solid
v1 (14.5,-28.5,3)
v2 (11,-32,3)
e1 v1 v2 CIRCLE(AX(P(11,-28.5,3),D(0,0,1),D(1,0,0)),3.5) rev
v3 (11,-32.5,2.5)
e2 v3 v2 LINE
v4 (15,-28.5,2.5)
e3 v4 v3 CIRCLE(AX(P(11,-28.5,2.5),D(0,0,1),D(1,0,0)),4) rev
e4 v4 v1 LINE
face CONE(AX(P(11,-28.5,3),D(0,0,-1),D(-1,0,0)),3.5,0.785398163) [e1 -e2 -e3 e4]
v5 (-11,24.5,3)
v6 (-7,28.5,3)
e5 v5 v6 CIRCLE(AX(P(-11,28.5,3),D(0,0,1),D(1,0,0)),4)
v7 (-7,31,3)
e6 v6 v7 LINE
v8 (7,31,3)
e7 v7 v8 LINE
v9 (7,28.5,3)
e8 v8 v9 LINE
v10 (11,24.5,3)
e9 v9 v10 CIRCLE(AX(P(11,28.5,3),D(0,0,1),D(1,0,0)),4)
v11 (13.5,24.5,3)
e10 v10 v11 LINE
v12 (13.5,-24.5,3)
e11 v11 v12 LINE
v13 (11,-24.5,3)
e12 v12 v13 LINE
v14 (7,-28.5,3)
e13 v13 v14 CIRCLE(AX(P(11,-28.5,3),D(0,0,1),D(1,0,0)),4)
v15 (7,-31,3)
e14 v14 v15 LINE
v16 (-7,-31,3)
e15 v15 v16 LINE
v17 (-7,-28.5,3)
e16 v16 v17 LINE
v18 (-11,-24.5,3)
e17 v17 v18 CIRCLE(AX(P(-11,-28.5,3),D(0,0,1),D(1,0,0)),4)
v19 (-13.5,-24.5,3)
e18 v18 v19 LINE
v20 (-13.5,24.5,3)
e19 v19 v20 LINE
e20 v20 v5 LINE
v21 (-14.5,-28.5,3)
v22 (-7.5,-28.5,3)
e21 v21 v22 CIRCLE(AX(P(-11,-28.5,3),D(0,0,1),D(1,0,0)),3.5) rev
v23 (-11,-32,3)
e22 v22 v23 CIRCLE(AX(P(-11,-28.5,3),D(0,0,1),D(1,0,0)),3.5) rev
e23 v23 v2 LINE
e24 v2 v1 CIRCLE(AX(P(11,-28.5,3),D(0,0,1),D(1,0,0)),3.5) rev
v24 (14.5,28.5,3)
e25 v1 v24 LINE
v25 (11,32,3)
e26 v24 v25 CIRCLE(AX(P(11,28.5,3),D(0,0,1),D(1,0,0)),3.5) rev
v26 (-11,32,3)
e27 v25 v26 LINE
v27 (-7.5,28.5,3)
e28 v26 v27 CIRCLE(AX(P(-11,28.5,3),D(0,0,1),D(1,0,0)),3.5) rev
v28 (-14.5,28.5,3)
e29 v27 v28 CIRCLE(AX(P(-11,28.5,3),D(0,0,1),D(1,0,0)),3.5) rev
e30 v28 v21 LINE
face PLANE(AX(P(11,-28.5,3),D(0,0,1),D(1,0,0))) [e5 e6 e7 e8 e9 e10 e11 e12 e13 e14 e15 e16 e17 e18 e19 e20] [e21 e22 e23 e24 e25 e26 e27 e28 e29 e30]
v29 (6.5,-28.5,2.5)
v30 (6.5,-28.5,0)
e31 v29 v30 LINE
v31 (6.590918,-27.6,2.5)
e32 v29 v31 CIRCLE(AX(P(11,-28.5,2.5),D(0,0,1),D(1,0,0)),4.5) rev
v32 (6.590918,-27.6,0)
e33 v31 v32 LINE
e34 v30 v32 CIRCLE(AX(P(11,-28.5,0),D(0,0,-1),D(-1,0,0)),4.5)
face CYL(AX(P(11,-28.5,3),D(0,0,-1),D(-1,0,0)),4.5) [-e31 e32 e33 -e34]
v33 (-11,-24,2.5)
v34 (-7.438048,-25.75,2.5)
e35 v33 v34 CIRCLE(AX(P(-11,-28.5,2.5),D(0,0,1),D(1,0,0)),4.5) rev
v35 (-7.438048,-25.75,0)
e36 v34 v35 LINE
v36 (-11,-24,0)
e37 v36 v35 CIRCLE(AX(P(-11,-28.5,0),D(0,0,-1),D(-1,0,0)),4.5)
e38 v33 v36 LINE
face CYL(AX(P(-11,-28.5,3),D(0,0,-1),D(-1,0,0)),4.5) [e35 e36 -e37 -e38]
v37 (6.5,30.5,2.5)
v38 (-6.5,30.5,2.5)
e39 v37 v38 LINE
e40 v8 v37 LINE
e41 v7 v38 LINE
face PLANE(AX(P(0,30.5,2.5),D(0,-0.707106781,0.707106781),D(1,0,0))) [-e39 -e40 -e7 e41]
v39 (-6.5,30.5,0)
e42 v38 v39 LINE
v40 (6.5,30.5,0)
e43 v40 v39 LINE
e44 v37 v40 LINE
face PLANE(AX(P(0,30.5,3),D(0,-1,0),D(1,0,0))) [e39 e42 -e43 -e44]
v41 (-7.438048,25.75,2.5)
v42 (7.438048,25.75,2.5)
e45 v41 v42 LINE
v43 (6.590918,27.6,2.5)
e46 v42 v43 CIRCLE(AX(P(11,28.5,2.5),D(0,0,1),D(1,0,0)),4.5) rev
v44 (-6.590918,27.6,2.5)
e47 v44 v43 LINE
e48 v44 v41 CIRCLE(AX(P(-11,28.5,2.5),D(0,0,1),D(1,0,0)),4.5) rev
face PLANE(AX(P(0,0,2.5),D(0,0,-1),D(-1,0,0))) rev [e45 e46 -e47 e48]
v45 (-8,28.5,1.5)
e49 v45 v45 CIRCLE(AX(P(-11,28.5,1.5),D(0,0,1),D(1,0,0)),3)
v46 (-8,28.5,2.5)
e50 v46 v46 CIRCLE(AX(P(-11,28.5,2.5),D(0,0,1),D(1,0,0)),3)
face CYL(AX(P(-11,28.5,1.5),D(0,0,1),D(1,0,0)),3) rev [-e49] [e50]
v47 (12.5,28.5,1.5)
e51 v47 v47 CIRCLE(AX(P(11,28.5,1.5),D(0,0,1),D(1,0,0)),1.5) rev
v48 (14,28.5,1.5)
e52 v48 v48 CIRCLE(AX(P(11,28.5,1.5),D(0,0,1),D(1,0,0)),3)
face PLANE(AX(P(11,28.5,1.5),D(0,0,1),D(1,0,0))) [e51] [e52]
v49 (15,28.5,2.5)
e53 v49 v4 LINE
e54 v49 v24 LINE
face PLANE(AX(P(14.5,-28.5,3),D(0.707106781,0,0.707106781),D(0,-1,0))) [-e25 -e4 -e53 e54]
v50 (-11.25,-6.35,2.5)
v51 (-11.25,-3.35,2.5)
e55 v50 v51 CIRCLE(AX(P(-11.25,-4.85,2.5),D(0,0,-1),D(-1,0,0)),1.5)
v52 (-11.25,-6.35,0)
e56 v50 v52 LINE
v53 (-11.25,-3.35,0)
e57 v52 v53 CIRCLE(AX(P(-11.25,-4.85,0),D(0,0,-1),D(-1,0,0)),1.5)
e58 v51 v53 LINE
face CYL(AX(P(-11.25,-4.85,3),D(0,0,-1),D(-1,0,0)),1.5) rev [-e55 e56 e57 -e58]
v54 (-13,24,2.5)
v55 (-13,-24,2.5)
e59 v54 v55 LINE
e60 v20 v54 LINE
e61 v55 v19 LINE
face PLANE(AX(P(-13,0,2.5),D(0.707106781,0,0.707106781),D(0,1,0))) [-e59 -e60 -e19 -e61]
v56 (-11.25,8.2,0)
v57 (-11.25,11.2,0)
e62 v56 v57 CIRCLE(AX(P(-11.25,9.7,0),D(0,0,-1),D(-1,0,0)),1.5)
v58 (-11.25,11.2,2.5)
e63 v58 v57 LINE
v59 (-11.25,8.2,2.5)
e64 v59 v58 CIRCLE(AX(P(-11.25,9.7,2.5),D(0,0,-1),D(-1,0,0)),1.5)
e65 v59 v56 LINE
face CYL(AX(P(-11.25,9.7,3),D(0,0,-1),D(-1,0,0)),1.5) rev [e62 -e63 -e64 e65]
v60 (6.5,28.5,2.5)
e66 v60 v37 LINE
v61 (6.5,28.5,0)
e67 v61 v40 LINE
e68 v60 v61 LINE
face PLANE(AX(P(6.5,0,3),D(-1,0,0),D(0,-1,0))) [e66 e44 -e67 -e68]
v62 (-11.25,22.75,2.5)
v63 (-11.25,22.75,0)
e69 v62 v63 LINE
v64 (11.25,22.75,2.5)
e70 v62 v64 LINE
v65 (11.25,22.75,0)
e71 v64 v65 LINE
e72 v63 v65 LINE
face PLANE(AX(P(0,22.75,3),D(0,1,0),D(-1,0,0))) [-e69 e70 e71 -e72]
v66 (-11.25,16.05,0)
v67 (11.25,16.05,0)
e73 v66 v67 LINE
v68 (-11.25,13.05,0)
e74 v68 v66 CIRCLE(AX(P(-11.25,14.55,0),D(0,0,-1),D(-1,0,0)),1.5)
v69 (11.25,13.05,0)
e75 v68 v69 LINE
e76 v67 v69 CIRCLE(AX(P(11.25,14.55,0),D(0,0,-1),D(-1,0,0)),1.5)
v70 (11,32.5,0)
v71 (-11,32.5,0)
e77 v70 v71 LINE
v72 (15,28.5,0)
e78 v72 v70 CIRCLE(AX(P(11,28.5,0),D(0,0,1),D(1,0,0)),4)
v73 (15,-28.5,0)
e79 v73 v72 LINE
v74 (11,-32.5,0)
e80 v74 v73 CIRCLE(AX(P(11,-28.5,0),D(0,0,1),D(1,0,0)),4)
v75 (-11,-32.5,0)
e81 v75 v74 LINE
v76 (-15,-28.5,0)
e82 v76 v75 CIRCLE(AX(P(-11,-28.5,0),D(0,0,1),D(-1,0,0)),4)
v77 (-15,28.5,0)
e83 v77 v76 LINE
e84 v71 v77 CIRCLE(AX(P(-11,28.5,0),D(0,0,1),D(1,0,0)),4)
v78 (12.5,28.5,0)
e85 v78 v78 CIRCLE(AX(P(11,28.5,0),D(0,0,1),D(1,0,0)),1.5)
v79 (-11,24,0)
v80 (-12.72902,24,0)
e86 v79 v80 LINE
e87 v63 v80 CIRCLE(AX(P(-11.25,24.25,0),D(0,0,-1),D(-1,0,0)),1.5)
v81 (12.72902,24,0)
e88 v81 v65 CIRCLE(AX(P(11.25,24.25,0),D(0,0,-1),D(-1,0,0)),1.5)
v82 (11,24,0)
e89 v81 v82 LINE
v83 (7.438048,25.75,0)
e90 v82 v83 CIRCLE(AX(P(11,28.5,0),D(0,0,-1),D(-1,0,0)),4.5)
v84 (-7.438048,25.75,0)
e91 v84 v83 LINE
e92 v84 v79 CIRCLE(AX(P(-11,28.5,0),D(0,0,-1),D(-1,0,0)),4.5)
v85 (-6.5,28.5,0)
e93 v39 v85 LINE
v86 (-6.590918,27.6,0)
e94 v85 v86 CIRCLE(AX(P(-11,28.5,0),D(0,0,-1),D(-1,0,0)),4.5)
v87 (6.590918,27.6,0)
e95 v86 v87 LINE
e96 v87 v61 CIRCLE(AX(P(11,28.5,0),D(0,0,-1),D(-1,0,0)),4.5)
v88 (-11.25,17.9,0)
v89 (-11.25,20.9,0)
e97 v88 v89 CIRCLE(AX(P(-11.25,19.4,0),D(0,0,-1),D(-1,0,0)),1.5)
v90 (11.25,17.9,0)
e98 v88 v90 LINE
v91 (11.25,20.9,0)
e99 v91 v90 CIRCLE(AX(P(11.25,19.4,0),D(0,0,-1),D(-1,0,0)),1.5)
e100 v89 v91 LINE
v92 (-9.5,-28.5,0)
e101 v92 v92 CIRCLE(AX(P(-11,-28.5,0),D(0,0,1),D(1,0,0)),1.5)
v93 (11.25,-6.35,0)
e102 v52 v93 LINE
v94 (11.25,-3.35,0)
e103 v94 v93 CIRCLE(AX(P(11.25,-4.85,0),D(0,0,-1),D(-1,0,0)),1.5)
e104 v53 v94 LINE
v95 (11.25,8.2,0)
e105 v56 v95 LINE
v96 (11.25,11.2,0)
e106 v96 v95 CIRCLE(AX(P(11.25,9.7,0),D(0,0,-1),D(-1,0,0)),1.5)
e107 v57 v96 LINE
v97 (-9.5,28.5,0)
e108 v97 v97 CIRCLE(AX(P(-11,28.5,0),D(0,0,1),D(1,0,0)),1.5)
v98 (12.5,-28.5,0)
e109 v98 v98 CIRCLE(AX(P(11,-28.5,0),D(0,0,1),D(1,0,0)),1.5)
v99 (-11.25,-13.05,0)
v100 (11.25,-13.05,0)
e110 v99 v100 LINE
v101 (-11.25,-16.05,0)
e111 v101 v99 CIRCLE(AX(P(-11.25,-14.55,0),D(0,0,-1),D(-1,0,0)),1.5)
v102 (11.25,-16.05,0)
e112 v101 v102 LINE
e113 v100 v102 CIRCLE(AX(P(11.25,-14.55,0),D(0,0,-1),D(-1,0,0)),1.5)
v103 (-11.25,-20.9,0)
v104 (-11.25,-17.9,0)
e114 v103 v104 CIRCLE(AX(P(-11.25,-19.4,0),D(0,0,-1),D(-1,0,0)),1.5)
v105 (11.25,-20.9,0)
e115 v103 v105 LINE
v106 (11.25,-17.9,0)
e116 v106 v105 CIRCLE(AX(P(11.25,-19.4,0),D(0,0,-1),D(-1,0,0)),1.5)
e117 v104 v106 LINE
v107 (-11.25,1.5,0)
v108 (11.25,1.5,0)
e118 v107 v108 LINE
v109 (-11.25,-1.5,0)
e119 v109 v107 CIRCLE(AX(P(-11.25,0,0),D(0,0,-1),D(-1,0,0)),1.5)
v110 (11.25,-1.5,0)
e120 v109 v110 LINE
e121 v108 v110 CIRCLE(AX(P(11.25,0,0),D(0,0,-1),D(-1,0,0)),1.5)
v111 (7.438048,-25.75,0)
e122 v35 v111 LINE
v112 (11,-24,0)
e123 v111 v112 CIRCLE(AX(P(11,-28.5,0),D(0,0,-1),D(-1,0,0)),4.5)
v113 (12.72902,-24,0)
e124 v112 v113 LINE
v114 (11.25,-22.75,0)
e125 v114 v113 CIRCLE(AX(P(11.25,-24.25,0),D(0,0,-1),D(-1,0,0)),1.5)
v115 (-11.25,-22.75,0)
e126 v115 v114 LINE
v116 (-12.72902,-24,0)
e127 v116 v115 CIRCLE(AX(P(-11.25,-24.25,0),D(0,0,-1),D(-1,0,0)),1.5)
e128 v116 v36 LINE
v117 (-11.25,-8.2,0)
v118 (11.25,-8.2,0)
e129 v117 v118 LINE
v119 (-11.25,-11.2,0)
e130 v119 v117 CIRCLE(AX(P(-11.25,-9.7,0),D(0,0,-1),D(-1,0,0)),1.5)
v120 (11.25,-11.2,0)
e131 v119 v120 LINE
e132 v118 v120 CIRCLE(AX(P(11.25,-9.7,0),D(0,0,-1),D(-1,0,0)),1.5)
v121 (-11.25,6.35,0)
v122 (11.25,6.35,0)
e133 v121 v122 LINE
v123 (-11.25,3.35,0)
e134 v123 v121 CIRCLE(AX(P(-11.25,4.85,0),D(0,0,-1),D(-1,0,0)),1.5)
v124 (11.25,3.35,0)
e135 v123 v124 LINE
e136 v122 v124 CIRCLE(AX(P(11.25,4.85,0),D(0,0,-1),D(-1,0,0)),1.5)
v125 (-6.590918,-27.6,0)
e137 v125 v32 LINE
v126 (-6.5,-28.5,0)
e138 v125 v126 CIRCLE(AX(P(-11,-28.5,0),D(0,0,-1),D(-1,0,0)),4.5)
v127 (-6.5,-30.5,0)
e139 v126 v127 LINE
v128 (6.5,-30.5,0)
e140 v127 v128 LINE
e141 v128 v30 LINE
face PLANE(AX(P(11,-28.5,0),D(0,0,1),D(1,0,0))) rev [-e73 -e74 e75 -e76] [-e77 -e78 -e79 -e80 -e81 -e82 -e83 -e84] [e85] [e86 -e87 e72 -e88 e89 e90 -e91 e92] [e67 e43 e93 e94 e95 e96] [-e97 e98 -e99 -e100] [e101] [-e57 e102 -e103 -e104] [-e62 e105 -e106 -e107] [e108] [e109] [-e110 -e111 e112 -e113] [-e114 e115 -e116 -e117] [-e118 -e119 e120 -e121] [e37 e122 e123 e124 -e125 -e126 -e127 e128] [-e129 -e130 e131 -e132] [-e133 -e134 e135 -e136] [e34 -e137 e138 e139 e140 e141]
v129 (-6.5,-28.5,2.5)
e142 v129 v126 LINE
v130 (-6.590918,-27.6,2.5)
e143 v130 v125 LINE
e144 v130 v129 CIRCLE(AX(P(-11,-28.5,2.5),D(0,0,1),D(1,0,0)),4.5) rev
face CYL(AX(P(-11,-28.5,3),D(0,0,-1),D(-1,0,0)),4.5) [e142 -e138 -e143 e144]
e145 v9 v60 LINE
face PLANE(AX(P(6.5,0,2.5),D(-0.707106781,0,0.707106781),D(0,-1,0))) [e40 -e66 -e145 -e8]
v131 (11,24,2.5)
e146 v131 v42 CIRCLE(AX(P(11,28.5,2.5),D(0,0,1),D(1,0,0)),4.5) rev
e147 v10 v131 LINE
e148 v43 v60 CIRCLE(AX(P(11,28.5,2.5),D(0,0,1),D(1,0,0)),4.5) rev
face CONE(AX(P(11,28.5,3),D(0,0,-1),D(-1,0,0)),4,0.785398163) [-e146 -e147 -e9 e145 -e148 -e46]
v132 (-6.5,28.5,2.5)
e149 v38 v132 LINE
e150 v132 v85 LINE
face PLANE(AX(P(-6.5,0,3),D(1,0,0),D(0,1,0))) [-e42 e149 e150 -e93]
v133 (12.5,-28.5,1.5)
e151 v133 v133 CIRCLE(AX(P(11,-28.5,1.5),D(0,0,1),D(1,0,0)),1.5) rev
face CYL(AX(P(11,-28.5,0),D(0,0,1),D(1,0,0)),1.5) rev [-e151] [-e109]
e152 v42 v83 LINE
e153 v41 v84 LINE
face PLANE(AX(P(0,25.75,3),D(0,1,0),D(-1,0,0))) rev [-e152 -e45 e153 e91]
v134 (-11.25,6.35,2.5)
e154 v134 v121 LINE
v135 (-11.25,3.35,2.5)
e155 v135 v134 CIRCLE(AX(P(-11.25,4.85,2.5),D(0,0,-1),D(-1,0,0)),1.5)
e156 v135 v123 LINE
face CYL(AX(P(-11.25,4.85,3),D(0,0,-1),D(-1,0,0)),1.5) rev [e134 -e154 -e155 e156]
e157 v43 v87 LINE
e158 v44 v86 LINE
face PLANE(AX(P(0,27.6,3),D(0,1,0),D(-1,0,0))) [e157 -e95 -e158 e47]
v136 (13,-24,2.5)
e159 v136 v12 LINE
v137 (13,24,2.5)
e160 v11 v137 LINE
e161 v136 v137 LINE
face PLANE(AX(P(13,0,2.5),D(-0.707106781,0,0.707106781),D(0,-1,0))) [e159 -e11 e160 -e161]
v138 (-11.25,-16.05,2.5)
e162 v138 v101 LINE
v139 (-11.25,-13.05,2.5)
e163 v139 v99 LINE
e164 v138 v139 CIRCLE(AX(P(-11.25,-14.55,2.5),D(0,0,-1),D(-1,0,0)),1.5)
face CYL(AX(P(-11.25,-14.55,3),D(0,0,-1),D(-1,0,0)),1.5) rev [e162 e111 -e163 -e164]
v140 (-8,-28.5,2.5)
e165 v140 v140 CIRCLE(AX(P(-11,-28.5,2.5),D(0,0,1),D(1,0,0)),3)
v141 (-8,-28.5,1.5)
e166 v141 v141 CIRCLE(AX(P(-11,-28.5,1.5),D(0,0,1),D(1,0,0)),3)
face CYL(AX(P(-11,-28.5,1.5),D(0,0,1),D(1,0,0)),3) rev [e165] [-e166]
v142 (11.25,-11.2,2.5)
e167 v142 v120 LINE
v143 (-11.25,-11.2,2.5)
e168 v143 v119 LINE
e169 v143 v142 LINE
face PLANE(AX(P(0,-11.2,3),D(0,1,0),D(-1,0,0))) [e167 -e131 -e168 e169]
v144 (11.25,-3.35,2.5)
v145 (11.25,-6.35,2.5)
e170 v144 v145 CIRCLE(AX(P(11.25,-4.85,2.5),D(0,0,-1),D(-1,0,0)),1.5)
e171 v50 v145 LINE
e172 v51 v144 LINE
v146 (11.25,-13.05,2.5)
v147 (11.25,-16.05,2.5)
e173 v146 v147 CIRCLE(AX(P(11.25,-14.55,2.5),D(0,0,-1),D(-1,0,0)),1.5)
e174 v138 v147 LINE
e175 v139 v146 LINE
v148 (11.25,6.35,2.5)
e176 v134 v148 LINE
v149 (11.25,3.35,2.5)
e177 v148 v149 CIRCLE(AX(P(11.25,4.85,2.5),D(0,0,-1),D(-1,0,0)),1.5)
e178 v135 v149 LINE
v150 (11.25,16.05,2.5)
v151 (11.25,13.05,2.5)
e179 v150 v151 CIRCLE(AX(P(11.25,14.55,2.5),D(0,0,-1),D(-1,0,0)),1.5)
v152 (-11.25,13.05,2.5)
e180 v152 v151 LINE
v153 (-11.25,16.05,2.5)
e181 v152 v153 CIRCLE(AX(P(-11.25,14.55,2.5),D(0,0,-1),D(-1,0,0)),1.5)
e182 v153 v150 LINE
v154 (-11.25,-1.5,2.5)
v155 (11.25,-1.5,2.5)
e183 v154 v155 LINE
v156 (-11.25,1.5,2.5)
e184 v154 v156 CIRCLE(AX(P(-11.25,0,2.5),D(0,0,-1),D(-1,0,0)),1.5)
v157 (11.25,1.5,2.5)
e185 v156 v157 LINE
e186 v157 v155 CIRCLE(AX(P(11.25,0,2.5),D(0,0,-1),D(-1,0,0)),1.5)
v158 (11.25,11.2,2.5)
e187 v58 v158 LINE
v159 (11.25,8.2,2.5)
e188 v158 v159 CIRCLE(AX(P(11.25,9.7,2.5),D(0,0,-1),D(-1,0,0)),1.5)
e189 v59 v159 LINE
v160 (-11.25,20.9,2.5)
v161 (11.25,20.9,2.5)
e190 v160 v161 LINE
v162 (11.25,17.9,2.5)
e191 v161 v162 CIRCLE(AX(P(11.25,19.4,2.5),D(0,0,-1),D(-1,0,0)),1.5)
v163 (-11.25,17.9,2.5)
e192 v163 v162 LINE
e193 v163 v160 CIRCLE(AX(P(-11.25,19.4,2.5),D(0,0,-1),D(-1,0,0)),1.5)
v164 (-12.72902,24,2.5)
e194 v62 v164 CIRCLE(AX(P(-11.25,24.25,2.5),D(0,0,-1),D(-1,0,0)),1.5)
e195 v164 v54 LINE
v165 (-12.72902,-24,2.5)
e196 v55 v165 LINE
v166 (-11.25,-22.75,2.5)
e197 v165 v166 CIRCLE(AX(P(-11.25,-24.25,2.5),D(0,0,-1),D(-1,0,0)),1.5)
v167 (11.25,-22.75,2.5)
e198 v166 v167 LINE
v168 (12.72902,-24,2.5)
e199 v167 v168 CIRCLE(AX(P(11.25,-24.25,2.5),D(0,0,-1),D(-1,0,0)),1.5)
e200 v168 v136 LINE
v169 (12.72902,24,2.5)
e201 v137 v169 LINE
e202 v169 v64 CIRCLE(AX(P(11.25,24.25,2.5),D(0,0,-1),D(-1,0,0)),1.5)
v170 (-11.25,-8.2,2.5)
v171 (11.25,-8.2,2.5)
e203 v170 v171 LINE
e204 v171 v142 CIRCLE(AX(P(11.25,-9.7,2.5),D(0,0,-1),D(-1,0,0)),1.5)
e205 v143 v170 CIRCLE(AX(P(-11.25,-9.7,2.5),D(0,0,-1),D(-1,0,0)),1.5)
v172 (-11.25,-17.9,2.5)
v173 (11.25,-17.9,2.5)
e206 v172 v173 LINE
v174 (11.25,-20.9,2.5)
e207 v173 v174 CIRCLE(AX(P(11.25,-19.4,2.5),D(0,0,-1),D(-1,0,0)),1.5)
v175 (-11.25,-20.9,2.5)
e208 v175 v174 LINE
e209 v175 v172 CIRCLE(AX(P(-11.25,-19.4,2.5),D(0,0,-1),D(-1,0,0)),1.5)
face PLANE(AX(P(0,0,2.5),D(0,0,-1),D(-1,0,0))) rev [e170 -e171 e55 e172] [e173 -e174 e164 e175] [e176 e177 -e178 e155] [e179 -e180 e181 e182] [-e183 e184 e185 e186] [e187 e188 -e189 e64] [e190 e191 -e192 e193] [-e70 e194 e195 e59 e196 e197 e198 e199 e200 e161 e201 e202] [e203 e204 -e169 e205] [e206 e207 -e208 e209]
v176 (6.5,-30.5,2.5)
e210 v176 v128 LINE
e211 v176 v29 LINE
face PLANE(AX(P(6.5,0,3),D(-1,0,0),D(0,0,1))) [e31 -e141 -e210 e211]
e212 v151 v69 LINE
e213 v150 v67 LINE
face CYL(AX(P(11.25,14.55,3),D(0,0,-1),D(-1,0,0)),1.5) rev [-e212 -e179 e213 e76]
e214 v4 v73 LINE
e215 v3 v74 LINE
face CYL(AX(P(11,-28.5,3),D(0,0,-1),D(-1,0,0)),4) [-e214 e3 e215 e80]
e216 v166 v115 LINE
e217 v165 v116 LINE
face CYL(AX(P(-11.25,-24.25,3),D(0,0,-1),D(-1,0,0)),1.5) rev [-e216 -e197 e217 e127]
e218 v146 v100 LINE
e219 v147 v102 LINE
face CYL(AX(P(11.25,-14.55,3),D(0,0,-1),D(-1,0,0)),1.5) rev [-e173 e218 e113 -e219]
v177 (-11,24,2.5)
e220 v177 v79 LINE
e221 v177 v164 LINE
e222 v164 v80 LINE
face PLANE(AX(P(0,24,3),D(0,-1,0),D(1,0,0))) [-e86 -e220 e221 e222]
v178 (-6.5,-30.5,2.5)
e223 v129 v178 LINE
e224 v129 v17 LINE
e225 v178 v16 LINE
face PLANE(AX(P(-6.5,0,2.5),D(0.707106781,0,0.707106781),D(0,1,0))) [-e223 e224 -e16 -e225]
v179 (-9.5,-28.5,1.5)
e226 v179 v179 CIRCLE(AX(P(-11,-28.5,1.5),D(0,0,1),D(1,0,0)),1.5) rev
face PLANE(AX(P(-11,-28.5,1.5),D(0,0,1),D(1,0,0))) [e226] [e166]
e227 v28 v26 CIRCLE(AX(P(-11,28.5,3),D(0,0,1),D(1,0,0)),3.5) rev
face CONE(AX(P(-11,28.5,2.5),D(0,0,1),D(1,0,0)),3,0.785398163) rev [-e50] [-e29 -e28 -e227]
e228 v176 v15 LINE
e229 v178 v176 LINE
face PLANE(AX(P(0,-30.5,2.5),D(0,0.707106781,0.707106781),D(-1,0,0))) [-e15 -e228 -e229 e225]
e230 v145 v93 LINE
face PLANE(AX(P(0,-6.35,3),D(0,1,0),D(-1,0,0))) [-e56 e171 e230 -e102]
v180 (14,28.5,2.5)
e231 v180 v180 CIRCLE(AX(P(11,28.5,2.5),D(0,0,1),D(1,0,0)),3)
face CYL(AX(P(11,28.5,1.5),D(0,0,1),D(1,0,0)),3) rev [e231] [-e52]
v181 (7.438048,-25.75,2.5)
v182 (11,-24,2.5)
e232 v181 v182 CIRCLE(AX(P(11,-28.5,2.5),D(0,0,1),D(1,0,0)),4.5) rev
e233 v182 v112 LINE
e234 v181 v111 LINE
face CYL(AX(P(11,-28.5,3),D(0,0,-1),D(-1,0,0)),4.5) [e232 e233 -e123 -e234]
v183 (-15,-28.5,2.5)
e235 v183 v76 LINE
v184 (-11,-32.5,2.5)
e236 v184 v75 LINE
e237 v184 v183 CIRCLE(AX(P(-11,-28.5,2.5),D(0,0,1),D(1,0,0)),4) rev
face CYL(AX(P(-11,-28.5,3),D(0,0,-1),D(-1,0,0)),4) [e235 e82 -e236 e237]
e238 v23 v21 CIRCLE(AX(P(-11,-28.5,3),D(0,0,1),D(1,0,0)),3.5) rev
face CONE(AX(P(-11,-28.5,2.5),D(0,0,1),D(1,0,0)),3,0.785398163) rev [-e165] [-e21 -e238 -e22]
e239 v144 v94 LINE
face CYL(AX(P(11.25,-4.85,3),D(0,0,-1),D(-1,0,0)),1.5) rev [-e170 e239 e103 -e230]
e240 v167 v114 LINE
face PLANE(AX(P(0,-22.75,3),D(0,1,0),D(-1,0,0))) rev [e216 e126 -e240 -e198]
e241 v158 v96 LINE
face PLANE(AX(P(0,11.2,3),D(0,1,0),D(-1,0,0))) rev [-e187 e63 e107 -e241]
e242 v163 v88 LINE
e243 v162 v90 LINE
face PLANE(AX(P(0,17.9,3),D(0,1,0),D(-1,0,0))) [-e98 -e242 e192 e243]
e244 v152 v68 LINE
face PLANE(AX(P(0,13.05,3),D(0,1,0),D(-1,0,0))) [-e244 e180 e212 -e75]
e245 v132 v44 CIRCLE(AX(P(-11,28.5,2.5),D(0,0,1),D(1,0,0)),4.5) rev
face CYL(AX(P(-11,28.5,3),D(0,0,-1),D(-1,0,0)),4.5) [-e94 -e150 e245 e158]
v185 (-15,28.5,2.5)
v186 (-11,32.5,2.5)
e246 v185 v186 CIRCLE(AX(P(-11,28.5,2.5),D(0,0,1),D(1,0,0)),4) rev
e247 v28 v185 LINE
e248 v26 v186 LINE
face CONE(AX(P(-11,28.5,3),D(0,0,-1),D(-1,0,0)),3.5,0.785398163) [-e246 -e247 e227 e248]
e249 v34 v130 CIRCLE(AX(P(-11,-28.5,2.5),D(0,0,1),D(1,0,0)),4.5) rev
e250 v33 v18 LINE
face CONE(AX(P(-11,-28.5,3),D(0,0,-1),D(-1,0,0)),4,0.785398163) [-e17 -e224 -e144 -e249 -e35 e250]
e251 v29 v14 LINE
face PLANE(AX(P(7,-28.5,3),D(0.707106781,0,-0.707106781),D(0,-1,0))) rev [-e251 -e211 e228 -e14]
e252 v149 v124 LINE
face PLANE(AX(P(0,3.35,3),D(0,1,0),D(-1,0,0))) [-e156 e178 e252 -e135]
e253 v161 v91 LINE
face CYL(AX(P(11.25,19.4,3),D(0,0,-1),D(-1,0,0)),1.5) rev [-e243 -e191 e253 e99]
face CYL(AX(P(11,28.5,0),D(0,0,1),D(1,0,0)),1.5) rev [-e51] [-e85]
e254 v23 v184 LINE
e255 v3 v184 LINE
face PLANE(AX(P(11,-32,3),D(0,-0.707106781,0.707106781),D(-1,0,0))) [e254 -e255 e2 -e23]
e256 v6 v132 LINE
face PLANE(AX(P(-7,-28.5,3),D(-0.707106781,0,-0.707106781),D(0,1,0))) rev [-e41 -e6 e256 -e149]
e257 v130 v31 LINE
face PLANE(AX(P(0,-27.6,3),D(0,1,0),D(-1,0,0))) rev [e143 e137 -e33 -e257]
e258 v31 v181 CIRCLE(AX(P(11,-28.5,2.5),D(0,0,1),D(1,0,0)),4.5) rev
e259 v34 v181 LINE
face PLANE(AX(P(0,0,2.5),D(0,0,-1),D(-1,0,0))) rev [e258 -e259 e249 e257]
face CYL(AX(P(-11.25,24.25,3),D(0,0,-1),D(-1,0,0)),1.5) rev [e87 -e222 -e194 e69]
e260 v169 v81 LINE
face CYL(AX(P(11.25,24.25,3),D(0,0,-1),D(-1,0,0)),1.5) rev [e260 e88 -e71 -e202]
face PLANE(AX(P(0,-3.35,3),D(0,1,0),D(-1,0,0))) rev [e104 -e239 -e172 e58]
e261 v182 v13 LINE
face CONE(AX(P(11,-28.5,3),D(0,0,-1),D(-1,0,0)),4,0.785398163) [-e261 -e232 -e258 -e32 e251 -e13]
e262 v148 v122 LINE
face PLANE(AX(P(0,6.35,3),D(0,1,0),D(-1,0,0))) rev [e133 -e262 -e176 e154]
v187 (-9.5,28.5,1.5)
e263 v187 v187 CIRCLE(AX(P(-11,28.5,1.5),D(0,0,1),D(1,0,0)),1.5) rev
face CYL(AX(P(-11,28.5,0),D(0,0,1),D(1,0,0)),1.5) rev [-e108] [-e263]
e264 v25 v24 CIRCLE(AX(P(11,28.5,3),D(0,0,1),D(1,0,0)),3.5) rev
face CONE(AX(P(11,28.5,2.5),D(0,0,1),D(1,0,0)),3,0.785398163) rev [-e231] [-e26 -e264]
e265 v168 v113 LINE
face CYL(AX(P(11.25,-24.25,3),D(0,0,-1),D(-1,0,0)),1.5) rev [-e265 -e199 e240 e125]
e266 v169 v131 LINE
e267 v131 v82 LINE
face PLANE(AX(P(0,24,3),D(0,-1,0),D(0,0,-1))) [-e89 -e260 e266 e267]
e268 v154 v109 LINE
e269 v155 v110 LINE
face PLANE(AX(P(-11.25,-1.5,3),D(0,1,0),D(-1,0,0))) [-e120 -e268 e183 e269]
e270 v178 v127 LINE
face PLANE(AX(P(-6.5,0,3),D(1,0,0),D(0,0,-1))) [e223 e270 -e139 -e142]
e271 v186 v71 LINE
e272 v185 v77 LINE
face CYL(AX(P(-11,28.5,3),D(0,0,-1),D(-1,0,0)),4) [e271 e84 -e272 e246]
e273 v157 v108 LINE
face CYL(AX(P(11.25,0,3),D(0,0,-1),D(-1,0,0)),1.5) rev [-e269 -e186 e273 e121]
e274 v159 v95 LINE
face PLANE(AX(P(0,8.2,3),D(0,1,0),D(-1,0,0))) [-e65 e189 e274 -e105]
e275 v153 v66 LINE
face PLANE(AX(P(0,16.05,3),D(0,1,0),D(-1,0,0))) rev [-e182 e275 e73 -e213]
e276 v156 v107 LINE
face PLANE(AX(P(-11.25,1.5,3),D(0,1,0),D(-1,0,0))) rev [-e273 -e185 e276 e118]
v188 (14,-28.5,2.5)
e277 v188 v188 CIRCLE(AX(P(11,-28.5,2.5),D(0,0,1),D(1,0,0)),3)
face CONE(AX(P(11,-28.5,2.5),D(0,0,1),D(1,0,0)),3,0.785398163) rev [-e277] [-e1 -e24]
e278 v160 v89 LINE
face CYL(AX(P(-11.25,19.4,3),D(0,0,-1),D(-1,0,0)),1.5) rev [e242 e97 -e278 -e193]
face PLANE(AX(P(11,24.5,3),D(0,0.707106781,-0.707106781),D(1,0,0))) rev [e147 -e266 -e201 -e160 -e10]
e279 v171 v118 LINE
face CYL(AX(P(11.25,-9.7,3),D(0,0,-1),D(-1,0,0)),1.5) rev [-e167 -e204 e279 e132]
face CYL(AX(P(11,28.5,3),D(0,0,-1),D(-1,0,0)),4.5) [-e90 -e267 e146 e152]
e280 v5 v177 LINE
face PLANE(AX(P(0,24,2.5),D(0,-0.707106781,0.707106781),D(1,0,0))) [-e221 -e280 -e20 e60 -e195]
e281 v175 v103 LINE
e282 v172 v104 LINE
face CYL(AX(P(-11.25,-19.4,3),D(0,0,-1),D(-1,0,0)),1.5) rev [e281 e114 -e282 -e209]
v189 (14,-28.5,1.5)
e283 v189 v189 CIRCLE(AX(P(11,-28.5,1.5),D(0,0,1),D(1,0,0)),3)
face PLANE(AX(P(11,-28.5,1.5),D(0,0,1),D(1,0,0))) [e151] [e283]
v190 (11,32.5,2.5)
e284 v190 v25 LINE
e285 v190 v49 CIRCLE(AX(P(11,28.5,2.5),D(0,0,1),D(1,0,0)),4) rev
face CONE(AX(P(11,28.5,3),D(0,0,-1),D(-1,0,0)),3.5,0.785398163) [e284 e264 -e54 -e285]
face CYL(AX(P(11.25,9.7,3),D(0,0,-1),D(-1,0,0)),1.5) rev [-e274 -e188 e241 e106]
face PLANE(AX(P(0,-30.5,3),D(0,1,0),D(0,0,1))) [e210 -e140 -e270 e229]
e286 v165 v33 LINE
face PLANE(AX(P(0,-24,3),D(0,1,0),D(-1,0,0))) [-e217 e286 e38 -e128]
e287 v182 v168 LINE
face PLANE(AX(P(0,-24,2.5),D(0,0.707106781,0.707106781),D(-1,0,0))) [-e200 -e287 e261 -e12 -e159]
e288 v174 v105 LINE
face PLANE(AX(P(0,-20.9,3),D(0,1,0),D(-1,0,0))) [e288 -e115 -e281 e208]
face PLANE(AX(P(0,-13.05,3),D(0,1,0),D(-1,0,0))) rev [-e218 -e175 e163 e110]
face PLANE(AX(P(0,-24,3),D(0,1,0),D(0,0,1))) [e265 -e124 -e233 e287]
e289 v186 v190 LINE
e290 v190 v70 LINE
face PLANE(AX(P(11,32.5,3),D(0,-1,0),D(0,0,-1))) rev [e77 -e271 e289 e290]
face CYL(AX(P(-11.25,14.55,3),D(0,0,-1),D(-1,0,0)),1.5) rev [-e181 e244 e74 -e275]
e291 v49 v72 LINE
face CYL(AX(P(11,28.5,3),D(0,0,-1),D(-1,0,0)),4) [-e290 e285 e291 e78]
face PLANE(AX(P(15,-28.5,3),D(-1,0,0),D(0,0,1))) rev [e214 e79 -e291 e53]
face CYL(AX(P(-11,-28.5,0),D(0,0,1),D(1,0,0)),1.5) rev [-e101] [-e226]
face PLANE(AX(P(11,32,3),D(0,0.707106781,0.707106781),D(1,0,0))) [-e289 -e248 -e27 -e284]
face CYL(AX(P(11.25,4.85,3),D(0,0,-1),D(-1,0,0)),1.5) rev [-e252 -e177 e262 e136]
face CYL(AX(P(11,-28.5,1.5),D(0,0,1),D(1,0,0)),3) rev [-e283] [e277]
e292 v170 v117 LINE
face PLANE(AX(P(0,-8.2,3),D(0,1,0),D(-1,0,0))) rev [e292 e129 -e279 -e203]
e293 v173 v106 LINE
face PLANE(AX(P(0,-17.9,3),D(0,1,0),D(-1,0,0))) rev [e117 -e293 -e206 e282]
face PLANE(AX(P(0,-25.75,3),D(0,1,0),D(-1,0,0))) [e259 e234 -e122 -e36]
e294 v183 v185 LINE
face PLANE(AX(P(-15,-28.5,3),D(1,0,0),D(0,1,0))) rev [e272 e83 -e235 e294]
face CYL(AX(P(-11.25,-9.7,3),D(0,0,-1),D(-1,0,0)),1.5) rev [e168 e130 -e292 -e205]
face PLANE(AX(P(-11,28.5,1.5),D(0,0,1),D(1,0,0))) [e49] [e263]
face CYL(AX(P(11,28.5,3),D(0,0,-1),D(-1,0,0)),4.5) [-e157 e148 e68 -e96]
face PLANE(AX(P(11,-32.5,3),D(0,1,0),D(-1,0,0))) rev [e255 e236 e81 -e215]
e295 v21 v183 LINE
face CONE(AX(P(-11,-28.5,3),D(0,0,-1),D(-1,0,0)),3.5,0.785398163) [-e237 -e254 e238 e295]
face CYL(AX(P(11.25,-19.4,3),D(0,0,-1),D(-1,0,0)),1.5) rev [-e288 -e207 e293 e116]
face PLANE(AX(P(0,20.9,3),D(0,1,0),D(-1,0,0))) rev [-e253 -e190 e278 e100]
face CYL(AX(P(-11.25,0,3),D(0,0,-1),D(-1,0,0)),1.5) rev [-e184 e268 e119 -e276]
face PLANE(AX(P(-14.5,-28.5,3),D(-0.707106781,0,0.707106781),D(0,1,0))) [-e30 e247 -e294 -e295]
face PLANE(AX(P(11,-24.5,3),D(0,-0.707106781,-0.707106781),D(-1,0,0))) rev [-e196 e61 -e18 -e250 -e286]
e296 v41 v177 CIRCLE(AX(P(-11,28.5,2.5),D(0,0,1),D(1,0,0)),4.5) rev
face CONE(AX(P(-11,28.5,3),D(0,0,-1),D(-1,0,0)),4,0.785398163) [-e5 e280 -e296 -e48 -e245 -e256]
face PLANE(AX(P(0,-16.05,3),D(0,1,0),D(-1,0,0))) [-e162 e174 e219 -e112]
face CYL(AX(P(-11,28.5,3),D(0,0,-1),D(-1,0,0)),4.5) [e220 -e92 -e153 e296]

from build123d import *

# Parameters (mm, degrees)
BASE_DEPTH          = 3
SKETCH2_R           = 1.5
CUT_EXTRUDE1_DEPTH  = 36.920050111
CUT_EXTRUDE2_DEPTH  = 36.920050111
SKETCH6_R           = 3
CUT_EXTRUDE3_DEPTH  = 1.5
CHAMFER2_SIZE       = 0.5
BOSS_EXTRUDE1_START = -2.5
BOSS_EXTRUDE1_DEPTH = 2.5
CUT_EXTRUDE4_START  = -2.5
CUT_EXTRUDE4_DEPTH  = 2.5


# Read off the part's stored shape, not the designer's step: Cut-Extrude4
with BuildPart() as part:
    # Sketch1 → Base (new body)
    with BuildSketch(Plane.XY):
        with BuildLine():
            Line((11, -32.5), (-11, -32.5))
            ThreePointArc((-11, -32.5), (-13.828427125, -31.328427125), (-15, -28.5))
            Line((-15, -28.5), (-15, 28.5))
            ThreePointArc((-15, 28.5), (-13.828427125, 31.328427125), (-11, 32.5))
            Line((-11, 32.5), (11, 32.5))
            ThreePointArc((11, 32.5), (13.828427125, 31.328427125), (15, 28.5))
            Line((15, 28.5), (15, -28.5))
            ThreePointArc((15, -28.5), (13.828427125, -31.328427125), (11, -32.5))
        make_face()
    extrude(amount=BASE_DEPTH)

    # Sketch2 → Cut-Extrude1 (cut, through all)
    with BuildSketch(Plane.XY.offset(3)):
        with Locations((-11, 28.5)):
            Circle(SKETCH2_R)
        with Locations((-11, -28.5)):
            Circle(SKETCH2_R)
        with Locations((11, -28.5)):
            Circle(SKETCH2_R)
        with Locations((11, 28.5)):
            Circle(SKETCH2_R)
    extrude(amount=-CUT_EXTRUDE1_DEPTH, mode=Mode.SUBTRACT)

    # Sketch3 → Cut-Extrude2 (cut, through all)
    with BuildSketch(Plane.XY.offset(3)):
        with BuildLine():
            Line((6.5, 28.5), (6.5, 30.5))
            Line((6.5, 30.5), (-6.5, 30.5))
            Line((-6.5, 30.5), (-6.5, 28.5))
            ThreePointArc((-6.5, 28.5), (-7.818019485, 25.318019485), (-11, 24))
            Line((-11, 24), (-13, 24))
            Line((-13, 24), (-13, -24))
            Line((-13, -24), (-11, -24))
            ThreePointArc((-11, -24), (-7.818019485, -25.318019485), (-6.5, -28.5))
            Line((-6.5, -28.5), (-6.5, -30.5))
            Line((-6.5, -30.5), (6.5, -30.5))
            Line((6.5, -30.5), (6.5, -28.5))
            ThreePointArc((6.5, -28.5), (7.818019485, -25.318019485), (11, -24))
            Line((11, -24), (13, -24))
            Line((13, -24), (13, 24))
            Line((13, 24), (11, 24))
            ThreePointArc((11, 24), (7.818019485, 25.318019485), (6.5, 28.5))
        make_face()
    extrude(amount=-CUT_EXTRUDE2_DEPTH, mode=Mode.SUBTRACT)

    # Sketch6 → Cut-Extrude3 (cut)
    with BuildSketch(Plane.XY.offset(3)):
        with Locations((-11, -28.5)):
            Circle(SKETCH6_R)
        with Locations((11, -28.5)):
            Circle(SKETCH6_R)
        with Locations((11, 28.5)):
            Circle(SKETCH6_R)
        with Locations((-11, 28.5)):
            Circle(SKETCH6_R)
    extrude(amount=-CUT_EXTRUDE3_DEPTH, mode=Mode.SUBTRACT)

    # Chamfer2
    chamfer2_edges = [part.edges().sort_by_distance(p)[0] for p in [
        (7.818019485, 25.318019485, 3),
        (13, 0, 3),
        (7.818019485, -25.318019485, 3),
        (-7.818019485, -25.318019485, 3),
        (-13, 0, 3),
        (-7.818019485, 25.318019485, 3),
        (0, -32.5, 3),
        (-13.828427125, -31.328427125, 3),
        (-15, 0, 3),
        (-13.828427125, 31.328427125, 3),
        (0, 32.5, 3),
        (13.828427125, 31.328427125, 3),
        (15, 0, 3),
        (13.828427125, -31.328427125, 3),
        (-14, -28.5, 3),
        (-14, 28.5, 3),
        (8, 28.5, 3),
        (8, -28.5, 3),
        (0, -30.5, 3),
        (0, 30.5, 3),
        (12, 24, 3),
        (6.5, 29.5, 3),
        (-6.5, 29.5, 3),
        (-12, 24, 3),
        (-12, -24, 3),
        (-6.5, -29.5, 3),
        (6.5, -29.5, 3),
        (12, -24, 3),
    ]]
    chamfer(chamfer2_edges, length=CHAMFER2_SIZE - 0.0001)  # a hair under: the kernel refuses the full size

    # Sketch9 → Boss-Extrude1 (add)
    with BuildSketch(Plane(origin=(0, 0, 0), x_dir=(-1, 0, 0), z_dir=(0, 0, -1)).offset(BOSS_EXTRUDE1_START)):
        with BuildLine():
            ThreePointArc((-6.5, -28.5), (-7.818019485, -25.318019485), (-11, -24))
            Line((-11, -24), (-13, -24))
            Line((-13, -24), (-13, 24))
            Line((-13, 24), (-11, 24))
            ThreePointArc((-11, 24), (-7.818019485, 25.318019485), (-6.5, 28.5))
            Line((-6.5, 28.5), (-6.5, 30.5))
            Line((-6.5, 30.5), (6.5, 30.5))
            Line((6.5, 30.5), (6.5, 28.5))
            ThreePointArc((6.5, 28.5), (7.818019485, 25.318019485), (11, 24))
            Line((11, 24), (13, 24))
            Line((13, 24), (13, -24))
            Line((13, -24), (11, -24))
            ThreePointArc((11, -24), (7.818019485, -25.318019485), (6.5, -28.5))
            Line((6.5, -28.5), (6.5, -30.5))
            Line((6.5, -30.5), (-6.5, -30.5))
            Line((-6.5, -30.5), (-6.5, -28.5))
        make_face()
    extrude(amount=BOSS_EXTRUDE1_DEPTH)

    # Cut-Extrude4 outline → Cut-Extrude4 (cut)
    with BuildSketch(Plane(origin=(0, 0, 0), x_dir=(-1, 0, 0), z_dir=(0, 0, -1)).offset(CUT_EXTRUDE4_START)):
        with BuildLine():
            ThreePointArc((11.25, -6.35), (12.75, -4.85), (11.25, -3.35))
            Line((11.25, -3.35), (-11.25, -3.35))
            ThreePointArc((-11.25, -3.35), (-12.75, -4.85), (-11.25, -6.35))
            Line((-11.25, -6.35), (11.25, -6.35))
        make_face()
        with BuildLine():
            ThreePointArc((11.25, 17.9), (12.75, 19.4), (11.25, 20.9))
            Line((11.25, 20.9), (-11.25, 20.9))
            ThreePointArc((-11.25, 20.9), (-12.75, 19.4), (-11.25, 17.9))
            Line((-11.25, 17.9), (11.25, 17.9))
        make_face()
        with BuildLine():
            Line((-11, 24), (-12.729019946, 24))
            ThreePointArc((-12.729019946, 24), (-12.218245837, 23.104356076), (-11.25, 22.75))
            Line((-11.25, 22.75), (11.25, 22.75))
            ThreePointArc((11.25, 22.75), (12.218245837, 23.104356076), (12.729019946, 24))
            Line((12.729019946, 24), (11, 24))
            ThreePointArc((11, 24), (9.015686517, 24.461126395), (7.438048288, 25.75))
            Line((7.438048288, 25.75), (-7.438048288, 25.75))
            ThreePointArc((-7.438048288, 25.75), (-9.015686517, 24.461126395), (-11, 24))
        make_face()
        with BuildLine():
            ThreePointArc((-6.5, 28.5), (-6.522787311, 28.047709671), (-6.590918463, 27.6))
            Line((-6.590918463, 27.6), (6.590918463, 27.6))
            ThreePointArc((6.590918463, 27.6), (6.522787311, 28.047709671), (6.5, 28.5))
            Line((6.5, 28.5), (6.5, 30.5))
            Line((6.5, 30.5), (-6.5, 30.5))
            Line((-6.5, 30.5), (-6.5, 28.5))
        make_face()
        with BuildLine():
            Line((-6.5, -28.5), (-6.5, -30.5))
            Line((-6.5, -30.5), (6.5, -30.5))
            Line((6.5, -30.5), (6.5, -28.5))
            ThreePointArc((6.5, -28.5), (6.522787311, -28.047709671), (6.590918463, -27.6))
            Line((6.590918463, -27.6), (-6.590918463, -27.6))
            ThreePointArc((-6.590918463, -27.6), (-6.522787311, -28.047709671), (-6.5, -28.5))
        make_face()
        with BuildLine():
            Line((-11.25, -1.5), (11.25, -1.5))
            ThreePointArc((11.25, -1.5), (12.75, 0), (11.25, 1.5))
            Line((11.25, 1.5), (-11.25, 1.5))
            ThreePointArc((-11.25, 1.5), (-12.75, 0), (-11.25, -1.5))
        make_face()
        with BuildLine():
            ThreePointArc((11.25, -11.2), (12.75, -9.7), (11.25, -8.2))
            Line((11.25, -8.2), (-11.25, -8.2))
            ThreePointArc((-11.25, -8.2), (-12.75, -9.7), (-11.25, -11.2))
            Line((-11.25, -11.2), (11.25, -11.2))
        make_face()
        with BuildLine():
            ThreePointArc((11.25, -16.05), (12.75, -14.55), (11.25, -13.05))
            Line((11.25, -13.05), (-11.25, -13.05))
            ThreePointArc((-11.25, -13.05), (-12.75, -14.55), (-11.25, -16.05))
            Line((-11.25, -16.05), (11.25, -16.05))
        make_face()
        with BuildLine():
            ThreePointArc((11.25, -20.9), (12.75, -19.4), (11.25, -17.9))
            Line((11.25, -17.9), (-11.25, -17.9))
            ThreePointArc((-11.25, -17.9), (-12.75, -19.4), (-11.25, -20.9))
            Line((-11.25, -20.9), (11.25, -20.9))
        make_face()
        with BuildLine():
            ThreePointArc((12.729019946, -24), (12.218245837, -23.104356076), (11.25, -22.75))
            Line((11.25, -22.75), (-11.25, -22.75))
            ThreePointArc((-11.25, -22.75), (-12.218245837, -23.104356076), (-12.729019946, -24))
            Line((-12.729019946, -24), (-11, -24))
            ThreePointArc((-11, -24), (-9.015686517, -24.461126395), (-7.438048288, -25.75))
            Line((-7.438048288, -25.75), (7.438048288, -25.75))
            ThreePointArc((7.438048288, -25.75), (9.015686517, -24.461126395), (11, -24))
            Line((11, -24), (12.729019946, -24))
        make_face()
        with BuildLine():
            ThreePointArc((11.25, 3.35), (12.75, 4.85), (11.25, 6.35))
            Line((11.25, 6.35), (-11.25, 6.35))
            ThreePointArc((-11.25, 6.35), (-12.75, 4.85), (-11.25, 3.35))
            Line((-11.25, 3.35), (11.25, 3.35))
        make_face()
        with BuildLine():
            ThreePointArc((11.25, 8.2), (12.75, 9.7), (11.25, 11.2))
            Line((11.25, 11.2), (-11.25, 11.2))
            ThreePointArc((-11.25, 11.2), (-12.75, 9.7), (-11.25, 8.2))
            Line((-11.25, 8.2), (11.25, 8.2))
        make_face()
        with BuildLine():
            ThreePointArc((11.25, 13.05), (12.75, 14.55), (11.25, 16.05))
            Line((11.25, 16.05), (-11.25, 16.05))
            ThreePointArc((-11.25, 16.05), (-12.75, 14.55), (-11.25, 13.05))
            Line((-11.25, 13.05), (11.25, 13.05))
        make_face()
    extrude(amount=CUT_EXTRUDE4_DEPTH, mode=Mode.SUBTRACT)


solid = part.part
